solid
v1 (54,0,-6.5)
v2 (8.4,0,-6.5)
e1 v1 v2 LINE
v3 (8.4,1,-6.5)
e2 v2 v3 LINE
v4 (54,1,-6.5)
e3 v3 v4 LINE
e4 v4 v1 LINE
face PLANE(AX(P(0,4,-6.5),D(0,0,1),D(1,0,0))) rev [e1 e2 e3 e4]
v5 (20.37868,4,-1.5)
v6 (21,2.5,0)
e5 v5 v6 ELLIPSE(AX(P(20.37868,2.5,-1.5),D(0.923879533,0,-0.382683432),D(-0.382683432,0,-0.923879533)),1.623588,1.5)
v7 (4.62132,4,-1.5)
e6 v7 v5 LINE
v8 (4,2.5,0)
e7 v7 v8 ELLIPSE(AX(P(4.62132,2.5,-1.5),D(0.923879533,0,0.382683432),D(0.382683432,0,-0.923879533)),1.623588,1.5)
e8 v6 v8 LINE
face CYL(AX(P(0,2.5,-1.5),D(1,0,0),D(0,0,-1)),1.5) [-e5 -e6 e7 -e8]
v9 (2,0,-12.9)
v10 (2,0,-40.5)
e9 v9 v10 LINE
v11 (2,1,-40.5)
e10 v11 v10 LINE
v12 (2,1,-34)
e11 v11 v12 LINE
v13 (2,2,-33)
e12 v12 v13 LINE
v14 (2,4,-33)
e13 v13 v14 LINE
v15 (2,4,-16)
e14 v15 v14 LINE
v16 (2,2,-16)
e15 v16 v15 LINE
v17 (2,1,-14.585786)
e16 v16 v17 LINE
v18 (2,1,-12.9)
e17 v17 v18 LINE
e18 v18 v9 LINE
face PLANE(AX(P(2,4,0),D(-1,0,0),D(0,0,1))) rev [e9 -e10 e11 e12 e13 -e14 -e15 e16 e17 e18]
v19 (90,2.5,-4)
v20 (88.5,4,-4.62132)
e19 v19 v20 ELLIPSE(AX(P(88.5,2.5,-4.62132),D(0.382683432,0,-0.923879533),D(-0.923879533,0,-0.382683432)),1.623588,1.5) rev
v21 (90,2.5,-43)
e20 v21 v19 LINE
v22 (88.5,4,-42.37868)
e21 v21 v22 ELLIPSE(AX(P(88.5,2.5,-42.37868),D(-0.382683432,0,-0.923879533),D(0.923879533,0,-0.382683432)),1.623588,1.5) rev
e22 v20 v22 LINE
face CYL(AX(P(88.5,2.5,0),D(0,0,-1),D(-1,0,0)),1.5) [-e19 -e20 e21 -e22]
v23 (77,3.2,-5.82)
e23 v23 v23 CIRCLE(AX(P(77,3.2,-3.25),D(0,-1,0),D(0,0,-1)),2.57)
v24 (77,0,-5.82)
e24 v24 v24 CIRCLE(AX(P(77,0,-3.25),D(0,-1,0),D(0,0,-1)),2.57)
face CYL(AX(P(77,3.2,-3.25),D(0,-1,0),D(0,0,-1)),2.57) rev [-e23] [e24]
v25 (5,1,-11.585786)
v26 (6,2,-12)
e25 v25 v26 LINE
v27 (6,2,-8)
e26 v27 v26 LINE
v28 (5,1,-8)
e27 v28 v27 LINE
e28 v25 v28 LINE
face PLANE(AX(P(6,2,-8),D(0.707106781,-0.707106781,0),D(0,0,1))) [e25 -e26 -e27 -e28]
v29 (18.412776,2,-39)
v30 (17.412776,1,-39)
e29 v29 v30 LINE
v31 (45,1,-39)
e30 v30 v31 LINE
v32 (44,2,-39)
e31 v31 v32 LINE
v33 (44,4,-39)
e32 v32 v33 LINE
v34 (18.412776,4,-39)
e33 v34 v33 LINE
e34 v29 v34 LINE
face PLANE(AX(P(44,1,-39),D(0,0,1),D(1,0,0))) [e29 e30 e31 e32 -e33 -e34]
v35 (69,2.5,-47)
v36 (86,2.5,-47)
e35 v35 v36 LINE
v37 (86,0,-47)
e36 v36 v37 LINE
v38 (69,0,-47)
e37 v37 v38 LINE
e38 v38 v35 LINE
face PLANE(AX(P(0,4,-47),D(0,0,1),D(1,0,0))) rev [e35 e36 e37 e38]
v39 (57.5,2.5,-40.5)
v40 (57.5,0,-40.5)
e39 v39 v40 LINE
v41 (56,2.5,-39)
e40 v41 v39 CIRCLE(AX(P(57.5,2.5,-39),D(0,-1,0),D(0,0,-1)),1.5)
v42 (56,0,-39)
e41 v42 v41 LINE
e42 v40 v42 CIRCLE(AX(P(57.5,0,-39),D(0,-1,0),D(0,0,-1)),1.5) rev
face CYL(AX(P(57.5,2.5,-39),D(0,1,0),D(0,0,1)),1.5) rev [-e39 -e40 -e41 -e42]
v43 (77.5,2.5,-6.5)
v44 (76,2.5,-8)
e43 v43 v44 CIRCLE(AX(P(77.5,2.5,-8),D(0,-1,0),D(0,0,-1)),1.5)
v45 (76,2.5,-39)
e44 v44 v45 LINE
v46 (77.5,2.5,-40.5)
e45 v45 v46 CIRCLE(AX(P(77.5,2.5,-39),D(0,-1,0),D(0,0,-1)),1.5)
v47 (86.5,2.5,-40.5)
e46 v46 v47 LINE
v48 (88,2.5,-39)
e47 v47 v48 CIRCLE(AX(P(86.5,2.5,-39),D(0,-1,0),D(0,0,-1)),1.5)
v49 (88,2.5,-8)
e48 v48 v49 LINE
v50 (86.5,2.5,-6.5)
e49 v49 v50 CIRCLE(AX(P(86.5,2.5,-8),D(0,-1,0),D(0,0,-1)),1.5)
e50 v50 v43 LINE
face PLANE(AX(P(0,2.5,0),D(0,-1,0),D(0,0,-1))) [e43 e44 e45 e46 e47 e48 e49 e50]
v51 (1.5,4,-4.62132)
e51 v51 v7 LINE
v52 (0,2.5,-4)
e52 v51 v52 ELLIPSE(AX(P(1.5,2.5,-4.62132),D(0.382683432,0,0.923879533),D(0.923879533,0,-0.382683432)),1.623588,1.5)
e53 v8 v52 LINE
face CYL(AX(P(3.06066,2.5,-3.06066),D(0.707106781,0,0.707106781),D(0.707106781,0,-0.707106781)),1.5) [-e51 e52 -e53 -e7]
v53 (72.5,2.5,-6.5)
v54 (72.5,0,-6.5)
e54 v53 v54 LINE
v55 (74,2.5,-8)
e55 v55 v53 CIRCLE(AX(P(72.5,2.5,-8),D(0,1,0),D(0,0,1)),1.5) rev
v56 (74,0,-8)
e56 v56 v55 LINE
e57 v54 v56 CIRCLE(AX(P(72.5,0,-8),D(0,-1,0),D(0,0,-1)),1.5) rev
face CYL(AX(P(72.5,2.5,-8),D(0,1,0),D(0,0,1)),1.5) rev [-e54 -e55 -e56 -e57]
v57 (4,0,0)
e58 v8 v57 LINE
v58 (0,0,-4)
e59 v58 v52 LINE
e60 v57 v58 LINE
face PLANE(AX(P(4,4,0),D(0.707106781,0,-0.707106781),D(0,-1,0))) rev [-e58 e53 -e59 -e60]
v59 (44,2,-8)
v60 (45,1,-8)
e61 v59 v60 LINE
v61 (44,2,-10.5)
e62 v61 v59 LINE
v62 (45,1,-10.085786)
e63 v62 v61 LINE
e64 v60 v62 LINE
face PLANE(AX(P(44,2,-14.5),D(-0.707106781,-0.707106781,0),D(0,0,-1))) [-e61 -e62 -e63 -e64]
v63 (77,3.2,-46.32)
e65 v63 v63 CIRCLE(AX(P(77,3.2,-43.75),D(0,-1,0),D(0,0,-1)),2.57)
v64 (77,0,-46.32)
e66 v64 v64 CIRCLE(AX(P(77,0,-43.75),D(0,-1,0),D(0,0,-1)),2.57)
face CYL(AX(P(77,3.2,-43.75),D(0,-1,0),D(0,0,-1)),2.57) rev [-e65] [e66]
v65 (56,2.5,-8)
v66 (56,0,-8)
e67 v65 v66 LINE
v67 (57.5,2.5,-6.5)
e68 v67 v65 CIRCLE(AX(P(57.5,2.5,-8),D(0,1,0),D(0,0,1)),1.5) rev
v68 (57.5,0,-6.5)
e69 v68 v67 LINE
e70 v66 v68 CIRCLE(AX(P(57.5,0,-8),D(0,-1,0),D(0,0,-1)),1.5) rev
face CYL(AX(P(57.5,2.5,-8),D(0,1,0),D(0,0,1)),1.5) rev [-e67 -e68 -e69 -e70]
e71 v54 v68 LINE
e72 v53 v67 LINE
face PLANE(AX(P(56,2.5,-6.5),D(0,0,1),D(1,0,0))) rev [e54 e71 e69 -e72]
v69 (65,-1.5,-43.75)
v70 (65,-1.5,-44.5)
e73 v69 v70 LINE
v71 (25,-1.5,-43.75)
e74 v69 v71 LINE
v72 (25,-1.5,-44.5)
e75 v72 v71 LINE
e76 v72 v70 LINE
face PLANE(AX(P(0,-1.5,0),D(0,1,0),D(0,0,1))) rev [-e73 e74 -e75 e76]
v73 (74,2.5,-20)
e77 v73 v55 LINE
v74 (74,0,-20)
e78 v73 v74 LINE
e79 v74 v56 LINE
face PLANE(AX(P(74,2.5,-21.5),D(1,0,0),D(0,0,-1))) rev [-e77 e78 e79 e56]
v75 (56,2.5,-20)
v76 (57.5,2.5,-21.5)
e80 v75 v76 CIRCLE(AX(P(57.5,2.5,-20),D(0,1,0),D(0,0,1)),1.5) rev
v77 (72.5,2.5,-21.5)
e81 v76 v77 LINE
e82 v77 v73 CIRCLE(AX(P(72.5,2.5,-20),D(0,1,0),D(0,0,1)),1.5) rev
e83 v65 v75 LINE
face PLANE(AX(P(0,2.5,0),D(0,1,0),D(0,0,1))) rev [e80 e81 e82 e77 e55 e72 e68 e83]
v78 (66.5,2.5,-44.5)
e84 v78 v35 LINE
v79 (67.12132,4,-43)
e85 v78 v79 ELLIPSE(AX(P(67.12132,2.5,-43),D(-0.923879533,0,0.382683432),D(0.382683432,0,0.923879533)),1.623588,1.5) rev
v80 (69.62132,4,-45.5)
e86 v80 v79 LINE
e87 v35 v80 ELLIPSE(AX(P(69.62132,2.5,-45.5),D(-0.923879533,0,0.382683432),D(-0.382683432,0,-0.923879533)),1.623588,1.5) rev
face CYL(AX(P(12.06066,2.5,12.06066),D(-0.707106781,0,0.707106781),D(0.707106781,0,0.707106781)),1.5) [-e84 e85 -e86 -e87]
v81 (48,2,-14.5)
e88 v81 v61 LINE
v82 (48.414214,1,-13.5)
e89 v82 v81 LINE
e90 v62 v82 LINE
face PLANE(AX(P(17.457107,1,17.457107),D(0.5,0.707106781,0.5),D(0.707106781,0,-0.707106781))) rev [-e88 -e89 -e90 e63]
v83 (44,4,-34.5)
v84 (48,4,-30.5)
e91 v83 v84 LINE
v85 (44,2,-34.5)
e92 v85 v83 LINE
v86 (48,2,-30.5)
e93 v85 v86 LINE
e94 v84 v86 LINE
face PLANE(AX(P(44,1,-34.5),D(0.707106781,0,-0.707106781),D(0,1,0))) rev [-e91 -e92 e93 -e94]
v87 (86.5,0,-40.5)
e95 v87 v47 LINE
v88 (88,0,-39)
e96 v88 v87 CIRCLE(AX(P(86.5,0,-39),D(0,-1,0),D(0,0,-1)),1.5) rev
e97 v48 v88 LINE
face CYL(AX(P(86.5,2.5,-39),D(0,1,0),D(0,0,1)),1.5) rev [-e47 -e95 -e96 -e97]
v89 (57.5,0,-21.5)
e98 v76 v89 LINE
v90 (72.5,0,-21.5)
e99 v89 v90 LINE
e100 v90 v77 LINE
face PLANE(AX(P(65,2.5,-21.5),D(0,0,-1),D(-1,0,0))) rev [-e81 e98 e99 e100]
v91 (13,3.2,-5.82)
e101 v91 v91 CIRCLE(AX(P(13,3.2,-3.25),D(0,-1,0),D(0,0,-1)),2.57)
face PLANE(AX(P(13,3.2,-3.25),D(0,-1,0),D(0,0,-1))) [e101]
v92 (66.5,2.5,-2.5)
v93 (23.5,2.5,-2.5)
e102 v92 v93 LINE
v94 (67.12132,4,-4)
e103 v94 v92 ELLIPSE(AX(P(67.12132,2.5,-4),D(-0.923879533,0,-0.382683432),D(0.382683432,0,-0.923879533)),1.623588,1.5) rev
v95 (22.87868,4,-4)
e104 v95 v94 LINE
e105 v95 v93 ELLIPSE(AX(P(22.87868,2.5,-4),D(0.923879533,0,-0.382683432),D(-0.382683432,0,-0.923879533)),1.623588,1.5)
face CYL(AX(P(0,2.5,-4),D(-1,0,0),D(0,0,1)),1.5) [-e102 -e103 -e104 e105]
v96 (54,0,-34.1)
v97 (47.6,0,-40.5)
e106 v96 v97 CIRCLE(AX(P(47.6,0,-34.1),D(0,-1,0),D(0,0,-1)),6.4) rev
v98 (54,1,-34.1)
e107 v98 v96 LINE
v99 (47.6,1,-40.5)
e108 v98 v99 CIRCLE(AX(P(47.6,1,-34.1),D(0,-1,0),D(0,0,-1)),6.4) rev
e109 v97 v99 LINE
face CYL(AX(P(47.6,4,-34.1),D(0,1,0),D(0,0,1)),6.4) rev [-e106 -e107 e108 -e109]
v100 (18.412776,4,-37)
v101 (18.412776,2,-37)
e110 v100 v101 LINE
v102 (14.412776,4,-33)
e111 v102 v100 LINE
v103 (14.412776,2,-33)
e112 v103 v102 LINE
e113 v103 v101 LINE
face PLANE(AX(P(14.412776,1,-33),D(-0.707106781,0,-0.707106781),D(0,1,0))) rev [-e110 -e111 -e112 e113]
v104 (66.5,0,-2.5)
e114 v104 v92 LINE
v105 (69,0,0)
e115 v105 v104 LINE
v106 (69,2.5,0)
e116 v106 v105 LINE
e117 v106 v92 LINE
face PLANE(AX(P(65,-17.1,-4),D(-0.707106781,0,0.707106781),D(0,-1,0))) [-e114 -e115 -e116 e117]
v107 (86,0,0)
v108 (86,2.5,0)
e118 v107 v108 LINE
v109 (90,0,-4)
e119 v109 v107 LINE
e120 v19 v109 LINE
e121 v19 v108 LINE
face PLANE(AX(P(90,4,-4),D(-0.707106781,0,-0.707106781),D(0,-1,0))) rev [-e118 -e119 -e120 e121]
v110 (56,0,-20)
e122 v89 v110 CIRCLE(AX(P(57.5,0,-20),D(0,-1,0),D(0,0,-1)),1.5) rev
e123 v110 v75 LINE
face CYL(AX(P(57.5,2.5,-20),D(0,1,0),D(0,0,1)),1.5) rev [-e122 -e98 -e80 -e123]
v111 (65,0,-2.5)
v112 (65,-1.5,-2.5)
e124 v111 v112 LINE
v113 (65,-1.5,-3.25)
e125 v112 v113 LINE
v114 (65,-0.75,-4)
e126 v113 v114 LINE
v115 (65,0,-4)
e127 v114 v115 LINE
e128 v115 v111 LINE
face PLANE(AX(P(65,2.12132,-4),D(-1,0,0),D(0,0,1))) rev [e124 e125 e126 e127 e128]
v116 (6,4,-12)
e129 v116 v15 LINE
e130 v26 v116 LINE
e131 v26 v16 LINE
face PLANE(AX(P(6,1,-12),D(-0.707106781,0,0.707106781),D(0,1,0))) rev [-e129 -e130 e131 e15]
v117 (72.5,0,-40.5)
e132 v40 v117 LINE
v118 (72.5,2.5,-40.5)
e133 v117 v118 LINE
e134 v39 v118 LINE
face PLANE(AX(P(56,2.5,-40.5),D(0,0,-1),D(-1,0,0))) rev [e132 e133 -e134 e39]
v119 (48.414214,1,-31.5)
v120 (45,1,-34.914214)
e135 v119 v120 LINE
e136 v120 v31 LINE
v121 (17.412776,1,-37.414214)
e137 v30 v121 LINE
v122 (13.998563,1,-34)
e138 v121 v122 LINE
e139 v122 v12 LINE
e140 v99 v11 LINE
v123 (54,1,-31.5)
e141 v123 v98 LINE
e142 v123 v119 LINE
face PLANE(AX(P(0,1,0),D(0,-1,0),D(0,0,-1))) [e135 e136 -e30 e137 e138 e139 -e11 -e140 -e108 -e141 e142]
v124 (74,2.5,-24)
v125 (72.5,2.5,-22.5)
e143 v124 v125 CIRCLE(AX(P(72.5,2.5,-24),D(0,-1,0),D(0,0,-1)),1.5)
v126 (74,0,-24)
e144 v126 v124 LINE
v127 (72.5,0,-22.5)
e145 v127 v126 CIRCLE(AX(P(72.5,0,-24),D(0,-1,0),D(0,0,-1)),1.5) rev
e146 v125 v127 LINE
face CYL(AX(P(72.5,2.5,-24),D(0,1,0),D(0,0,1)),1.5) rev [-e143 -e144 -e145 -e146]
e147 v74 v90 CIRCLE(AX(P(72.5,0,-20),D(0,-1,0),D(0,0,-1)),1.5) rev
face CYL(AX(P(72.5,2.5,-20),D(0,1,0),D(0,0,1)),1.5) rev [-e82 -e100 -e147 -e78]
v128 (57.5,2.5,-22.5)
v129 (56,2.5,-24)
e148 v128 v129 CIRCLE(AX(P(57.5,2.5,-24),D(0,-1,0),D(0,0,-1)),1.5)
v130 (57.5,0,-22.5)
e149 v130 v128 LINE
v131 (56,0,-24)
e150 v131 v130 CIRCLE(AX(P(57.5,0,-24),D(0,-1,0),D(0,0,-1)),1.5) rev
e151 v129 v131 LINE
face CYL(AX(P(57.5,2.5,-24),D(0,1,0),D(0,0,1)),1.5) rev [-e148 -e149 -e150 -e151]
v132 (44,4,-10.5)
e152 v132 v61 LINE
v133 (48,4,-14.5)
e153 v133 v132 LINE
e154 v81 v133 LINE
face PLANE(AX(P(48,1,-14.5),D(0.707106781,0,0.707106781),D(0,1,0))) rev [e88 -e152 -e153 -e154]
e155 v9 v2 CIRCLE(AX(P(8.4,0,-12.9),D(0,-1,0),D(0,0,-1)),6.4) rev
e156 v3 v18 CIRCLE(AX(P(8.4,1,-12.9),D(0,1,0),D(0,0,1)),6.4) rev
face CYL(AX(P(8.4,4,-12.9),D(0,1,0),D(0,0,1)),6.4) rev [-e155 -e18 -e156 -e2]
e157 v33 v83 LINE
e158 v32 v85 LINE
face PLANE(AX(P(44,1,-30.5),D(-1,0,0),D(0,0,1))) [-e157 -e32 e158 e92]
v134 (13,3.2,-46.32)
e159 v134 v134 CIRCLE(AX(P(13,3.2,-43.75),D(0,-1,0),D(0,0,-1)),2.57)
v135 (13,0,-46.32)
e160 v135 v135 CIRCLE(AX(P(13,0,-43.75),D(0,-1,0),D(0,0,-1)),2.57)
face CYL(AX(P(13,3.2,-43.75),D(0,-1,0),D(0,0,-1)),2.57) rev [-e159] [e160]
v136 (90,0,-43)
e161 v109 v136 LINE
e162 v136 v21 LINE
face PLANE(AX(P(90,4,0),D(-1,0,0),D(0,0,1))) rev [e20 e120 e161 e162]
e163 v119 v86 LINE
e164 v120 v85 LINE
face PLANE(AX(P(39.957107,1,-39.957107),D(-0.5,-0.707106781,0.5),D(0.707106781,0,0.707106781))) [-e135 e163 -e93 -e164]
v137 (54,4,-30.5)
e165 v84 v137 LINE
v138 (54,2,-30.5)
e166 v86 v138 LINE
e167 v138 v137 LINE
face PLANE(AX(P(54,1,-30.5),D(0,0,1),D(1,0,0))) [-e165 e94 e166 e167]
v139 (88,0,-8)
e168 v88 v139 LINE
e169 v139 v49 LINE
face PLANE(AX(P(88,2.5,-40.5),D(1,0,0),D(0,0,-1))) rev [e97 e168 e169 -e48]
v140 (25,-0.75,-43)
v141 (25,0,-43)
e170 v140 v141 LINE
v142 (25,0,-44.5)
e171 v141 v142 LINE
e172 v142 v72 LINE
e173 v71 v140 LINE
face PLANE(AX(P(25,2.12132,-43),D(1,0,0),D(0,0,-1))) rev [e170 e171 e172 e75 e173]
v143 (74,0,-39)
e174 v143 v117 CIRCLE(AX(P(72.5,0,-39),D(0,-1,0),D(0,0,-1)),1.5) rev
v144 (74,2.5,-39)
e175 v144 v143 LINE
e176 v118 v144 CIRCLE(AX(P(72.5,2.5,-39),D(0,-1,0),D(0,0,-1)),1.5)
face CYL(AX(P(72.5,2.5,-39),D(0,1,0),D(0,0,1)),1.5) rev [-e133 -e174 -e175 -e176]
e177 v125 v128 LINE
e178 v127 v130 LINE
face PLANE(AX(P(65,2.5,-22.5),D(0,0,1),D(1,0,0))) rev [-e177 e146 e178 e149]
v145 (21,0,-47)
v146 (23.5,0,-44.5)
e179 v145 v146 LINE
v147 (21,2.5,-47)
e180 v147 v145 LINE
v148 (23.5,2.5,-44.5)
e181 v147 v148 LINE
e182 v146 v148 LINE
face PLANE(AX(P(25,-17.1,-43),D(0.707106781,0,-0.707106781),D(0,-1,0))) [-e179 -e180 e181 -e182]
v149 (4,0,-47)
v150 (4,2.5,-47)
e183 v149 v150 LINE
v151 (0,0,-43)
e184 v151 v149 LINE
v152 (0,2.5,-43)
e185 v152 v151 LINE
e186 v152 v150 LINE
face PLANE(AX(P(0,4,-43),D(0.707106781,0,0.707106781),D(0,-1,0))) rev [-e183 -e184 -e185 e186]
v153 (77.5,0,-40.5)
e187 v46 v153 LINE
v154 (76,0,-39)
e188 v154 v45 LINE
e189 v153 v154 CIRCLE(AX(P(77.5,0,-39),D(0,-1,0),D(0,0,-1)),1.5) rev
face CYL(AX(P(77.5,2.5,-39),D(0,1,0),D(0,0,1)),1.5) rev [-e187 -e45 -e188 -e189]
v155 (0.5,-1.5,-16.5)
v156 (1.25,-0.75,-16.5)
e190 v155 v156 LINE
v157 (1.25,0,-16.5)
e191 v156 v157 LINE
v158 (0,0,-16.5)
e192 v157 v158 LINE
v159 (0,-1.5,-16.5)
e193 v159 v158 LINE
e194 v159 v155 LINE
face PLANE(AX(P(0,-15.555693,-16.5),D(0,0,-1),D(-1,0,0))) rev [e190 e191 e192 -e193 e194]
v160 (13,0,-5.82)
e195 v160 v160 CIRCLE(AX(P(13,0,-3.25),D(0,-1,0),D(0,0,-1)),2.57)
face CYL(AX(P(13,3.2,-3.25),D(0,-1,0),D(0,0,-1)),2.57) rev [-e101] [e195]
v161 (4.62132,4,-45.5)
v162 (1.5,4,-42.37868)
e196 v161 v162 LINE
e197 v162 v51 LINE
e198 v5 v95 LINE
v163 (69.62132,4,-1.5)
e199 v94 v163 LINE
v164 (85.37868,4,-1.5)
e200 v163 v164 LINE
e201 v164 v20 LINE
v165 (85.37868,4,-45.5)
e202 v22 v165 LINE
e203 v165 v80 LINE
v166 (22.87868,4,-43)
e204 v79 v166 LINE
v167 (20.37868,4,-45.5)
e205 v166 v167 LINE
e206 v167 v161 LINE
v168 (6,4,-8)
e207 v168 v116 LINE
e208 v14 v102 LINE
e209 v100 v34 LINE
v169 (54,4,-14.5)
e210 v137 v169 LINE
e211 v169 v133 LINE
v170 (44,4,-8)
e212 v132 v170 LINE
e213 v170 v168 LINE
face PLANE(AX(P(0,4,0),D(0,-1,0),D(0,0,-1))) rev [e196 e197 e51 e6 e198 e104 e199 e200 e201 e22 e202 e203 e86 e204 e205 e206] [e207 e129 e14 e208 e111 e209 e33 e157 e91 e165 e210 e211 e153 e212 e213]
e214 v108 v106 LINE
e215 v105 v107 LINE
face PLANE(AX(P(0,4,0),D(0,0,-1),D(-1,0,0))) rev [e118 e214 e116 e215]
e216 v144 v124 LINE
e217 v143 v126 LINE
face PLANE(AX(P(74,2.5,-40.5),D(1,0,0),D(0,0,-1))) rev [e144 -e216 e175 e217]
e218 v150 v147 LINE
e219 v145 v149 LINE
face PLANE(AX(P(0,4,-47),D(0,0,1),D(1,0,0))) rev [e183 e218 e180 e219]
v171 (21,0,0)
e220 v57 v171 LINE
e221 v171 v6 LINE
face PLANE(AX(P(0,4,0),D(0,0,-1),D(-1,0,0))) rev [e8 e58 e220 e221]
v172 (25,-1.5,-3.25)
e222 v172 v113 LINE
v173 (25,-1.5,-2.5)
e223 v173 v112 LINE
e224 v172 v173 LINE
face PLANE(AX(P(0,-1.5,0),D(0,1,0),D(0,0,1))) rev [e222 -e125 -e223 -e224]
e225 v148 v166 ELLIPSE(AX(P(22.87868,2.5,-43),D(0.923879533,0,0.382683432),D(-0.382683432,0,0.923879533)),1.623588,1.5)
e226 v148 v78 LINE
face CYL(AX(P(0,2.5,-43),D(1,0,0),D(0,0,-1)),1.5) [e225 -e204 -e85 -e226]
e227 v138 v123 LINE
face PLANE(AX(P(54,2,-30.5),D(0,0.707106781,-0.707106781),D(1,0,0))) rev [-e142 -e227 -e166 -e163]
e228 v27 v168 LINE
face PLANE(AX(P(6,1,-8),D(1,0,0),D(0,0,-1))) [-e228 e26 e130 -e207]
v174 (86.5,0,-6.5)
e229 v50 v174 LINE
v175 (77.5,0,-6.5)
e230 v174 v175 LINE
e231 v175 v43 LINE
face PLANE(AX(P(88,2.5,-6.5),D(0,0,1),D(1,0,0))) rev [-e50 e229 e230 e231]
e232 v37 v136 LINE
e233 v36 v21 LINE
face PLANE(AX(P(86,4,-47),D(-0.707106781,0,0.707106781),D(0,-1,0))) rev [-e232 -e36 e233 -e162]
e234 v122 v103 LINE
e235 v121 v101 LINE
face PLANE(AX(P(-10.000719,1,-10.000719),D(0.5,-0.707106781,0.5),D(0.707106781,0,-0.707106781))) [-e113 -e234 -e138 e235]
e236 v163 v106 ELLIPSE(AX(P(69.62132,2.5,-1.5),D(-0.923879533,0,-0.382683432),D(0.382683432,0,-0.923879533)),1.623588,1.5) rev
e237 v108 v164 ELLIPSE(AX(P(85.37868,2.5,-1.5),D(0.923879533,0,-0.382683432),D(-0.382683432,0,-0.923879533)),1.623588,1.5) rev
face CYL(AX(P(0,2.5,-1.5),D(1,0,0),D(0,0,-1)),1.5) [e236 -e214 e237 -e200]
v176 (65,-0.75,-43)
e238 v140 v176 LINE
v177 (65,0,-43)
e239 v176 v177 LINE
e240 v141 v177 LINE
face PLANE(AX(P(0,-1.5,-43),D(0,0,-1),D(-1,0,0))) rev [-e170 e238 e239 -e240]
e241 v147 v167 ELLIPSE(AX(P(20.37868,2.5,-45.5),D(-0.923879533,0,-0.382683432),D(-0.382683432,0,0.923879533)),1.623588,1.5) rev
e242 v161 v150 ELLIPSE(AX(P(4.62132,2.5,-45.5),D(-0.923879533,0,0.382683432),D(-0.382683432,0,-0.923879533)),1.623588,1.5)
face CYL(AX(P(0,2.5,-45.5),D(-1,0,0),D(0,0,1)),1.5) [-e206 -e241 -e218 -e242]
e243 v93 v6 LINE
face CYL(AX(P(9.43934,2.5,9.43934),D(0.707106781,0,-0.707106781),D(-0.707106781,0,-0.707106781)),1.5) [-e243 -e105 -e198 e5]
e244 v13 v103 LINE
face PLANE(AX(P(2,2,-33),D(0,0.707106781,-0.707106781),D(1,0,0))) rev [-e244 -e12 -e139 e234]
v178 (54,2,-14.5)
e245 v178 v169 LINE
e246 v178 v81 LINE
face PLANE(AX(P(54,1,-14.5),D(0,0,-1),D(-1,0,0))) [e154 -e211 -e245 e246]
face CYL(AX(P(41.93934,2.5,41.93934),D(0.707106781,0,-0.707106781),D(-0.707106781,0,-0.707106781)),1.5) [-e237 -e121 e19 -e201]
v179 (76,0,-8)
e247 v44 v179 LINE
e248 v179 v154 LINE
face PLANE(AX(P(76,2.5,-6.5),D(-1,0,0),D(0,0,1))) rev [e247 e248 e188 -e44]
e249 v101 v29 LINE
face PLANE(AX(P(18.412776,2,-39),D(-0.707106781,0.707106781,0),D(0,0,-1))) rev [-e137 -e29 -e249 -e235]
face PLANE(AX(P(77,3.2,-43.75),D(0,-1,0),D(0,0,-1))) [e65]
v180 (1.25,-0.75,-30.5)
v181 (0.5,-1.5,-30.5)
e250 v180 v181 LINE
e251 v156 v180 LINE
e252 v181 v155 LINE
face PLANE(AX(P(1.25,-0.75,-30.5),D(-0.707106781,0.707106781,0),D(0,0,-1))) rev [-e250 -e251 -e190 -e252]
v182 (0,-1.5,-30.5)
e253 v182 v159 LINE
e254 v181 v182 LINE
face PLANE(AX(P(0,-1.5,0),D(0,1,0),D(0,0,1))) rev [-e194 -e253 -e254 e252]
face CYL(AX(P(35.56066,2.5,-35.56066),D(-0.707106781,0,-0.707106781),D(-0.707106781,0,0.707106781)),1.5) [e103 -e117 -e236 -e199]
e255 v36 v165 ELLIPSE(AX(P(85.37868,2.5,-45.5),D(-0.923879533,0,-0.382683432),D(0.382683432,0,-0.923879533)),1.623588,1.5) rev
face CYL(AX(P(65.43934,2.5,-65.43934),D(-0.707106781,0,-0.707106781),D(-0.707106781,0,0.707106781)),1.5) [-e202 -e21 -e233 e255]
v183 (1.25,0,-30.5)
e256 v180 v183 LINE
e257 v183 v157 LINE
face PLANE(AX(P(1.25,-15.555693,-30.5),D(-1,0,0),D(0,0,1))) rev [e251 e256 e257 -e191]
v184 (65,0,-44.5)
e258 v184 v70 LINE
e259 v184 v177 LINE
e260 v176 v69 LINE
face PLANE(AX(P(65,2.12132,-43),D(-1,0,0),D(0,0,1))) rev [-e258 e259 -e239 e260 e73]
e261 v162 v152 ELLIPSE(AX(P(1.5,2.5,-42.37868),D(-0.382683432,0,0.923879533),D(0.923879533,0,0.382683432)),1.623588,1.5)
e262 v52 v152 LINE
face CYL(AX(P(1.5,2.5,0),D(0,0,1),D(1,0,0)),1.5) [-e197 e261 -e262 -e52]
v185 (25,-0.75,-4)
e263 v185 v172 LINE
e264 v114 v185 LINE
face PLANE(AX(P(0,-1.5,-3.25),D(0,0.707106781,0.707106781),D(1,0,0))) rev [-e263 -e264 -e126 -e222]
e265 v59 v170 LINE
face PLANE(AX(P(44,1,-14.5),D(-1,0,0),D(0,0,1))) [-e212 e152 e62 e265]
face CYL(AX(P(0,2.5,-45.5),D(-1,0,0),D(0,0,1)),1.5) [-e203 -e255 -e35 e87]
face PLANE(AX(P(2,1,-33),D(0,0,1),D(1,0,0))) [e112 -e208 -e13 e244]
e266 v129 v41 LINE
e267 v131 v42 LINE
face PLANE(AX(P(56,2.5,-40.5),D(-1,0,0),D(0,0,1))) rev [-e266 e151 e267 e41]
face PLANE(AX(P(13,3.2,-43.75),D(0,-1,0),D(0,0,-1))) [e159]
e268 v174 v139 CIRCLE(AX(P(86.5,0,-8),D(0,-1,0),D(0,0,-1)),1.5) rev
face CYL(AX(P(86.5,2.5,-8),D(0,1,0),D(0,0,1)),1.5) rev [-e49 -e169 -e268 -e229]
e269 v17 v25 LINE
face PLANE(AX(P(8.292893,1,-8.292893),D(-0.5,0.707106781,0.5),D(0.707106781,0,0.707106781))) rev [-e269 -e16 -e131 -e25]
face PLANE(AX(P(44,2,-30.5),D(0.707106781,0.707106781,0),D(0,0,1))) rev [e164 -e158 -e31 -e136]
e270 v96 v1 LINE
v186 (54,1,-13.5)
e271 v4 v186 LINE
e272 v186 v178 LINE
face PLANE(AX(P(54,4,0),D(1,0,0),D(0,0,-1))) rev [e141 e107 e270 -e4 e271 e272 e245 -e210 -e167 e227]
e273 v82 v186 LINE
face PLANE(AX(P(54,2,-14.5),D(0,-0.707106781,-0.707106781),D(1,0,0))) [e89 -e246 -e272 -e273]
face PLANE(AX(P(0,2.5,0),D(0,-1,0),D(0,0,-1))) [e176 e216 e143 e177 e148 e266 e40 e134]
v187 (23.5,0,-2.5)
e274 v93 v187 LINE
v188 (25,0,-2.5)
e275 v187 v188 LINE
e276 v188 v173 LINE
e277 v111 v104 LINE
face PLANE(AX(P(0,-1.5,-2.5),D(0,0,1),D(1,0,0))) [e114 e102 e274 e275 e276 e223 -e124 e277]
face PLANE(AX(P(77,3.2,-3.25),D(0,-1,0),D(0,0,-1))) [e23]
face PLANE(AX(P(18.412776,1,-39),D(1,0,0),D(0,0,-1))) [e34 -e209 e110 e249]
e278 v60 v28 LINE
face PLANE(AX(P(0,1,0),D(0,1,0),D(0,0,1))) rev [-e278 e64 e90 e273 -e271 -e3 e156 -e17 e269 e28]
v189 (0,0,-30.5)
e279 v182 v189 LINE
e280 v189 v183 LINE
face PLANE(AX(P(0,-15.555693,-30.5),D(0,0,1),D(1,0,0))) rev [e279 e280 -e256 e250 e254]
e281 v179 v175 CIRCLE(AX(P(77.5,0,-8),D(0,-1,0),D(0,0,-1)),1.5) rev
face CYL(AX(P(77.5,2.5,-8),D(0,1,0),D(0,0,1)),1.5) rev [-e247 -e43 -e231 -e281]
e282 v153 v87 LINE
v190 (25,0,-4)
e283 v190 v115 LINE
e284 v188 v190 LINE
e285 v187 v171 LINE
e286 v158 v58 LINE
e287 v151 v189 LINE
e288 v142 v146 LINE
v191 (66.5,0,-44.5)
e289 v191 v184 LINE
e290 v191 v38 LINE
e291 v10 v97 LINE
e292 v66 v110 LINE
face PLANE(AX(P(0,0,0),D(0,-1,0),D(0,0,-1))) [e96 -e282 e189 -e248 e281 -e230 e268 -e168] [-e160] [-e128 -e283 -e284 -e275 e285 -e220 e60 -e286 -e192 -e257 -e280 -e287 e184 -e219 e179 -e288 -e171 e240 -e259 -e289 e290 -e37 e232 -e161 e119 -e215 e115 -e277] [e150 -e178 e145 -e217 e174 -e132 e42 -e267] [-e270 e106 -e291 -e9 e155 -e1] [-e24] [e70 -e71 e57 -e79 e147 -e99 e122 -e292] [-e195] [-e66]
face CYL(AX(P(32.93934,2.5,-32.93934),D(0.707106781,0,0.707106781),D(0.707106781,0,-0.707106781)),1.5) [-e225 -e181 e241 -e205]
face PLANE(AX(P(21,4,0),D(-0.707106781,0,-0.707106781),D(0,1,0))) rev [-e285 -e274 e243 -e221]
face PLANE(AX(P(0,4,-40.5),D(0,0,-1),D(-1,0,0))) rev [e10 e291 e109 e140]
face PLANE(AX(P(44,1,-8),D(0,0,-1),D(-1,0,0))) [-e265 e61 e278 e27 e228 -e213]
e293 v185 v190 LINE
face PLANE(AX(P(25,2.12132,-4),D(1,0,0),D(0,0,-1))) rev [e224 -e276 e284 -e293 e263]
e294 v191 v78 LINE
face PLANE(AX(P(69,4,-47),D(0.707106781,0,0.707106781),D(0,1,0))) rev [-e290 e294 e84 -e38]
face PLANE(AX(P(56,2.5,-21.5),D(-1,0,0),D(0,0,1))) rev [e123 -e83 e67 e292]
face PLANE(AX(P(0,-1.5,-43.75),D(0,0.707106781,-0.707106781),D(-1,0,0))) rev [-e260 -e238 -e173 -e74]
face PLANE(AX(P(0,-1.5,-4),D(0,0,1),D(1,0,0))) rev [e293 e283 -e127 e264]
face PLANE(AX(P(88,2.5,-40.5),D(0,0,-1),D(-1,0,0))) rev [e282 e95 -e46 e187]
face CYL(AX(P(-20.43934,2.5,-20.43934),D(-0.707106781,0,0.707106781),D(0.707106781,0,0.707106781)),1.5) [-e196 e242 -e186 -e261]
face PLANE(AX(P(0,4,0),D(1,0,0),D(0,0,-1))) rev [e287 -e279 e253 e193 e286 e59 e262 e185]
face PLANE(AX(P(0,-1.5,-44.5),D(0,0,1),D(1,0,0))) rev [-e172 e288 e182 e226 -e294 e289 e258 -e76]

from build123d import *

# Parameters (mm, degrees)
SKETCH1_W           = 90
SKETCH1_H           = 47
BOSS_EXTRUDE1_DEPTH = 4
CUT_EXTRUDE1_START  = -4
CUT_EXTRUDE1_DEPTH  = 106.612007165
FILLET1_R           = 6.4
CUT_EXTRUDE3_START  = -4
SKETCH4_R           = 2.57
CUT_EXTRUDE3_DEPTH  = 3.2
SKETCH5_W           = 20
SKETCH5_H           = 4
CUT_EXTRUDE4_DEPTH  = 21.1
CHAMFER1_SIZE       = 4
BOSS_EXTRUDE2_DEPTH = 3
CHAMFER2_SIZE       = 4
CHAMFER3_SIZE       = 4
SKETCH7_W           = 12
SKETCH7_H           = 34
CUT_EXTRUDE5_DEPTH  = 2.5
FILLET2_R           = 1.5
CHAMFER4_SIZE       = 1
BOSS_EXTRUDE3_DEPTH = 5.5
CUT_EXTRUDE6_DEPTH  = 1.5
FILLET3_R           = 1.5
BOSS_EXTRUDE4_DEPTH = 1.5
CHAMFER6_SIZE       = 0.75


with BuildPart() as part:
    # Sketch1 → Boss-Extrude1 (new body)
    with BuildSketch(Plane(origin=(0, 0, 0), x_dir=(1, 0, 0), z_dir=(0, 1, 0))):
        with Locations((45, 23.5)):
            Rectangle(SKETCH1_W, SKETCH1_H)
    extrude(amount=BOSS_EXTRUDE1_DEPTH)

    # Sketch2 → Cut-Extrude1 (cut, through all)
    with BuildSketch(Plane(origin=(0, 4, 0), x_dir=(1, 0, 0), z_dir=(0, 1, 0)).offset(CUT_EXTRUDE1_START)):
        Polygon((2, 23.5), (2, 40.5), (54, 40.5), (54, 6.5), (2, 6.5), align=None)
    extrude(amount=CUT_EXTRUDE1_DEPTH, mode=Mode.SUBTRACT)

    # Fillet1
    fillet1_edges = [part.edges().sort_by_distance(p)[0] for p in [
        (54, 2, -40.5),
        (2, 2, -6.5),
    ]]
    fillet(fillet1_edges, radius=FILLET1_R)

    # Sketch4 → Cut-Extrude3 (cut)
    with BuildSketch(Plane(origin=(0, 4, 0), x_dir=(1, 0, 0), z_dir=(0, 1, 0)).offset(CUT_EXTRUDE3_START)):
        with Locations(Location((13, 43.75, 0), (0, 0, 90))):
            Circle(SKETCH4_R)
        with Locations(Location((13, 3.25, 0), (0, 0, 90))):
            Circle(SKETCH4_R)
        with Locations(Location((77, 3.25, 0), (0, 0, 90))):
            Circle(SKETCH4_R)
        with Locations(Location((77, 43.75, 0), (0, 0, 90))):
            Circle(SKETCH4_R)
    extrude(amount=CUT_EXTRUDE3_DEPTH, mode=Mode.SUBTRACT)

    # Sketch5 → Cut-Extrude4 (cut)
    with BuildSketch(Plane(origin=(0, 4, 0), x_dir=(1, 0, 0), z_dir=(0, 1, 0))):
        with Locations((35, 2)):
            Rectangle(SKETCH5_W, SKETCH5_H)
        with Locations((55, 2)):
            Rectangle(SKETCH5_W, SKETCH5_H)
        with Locations((35, 45)):
            Rectangle(SKETCH5_W, SKETCH5_H)
        with Locations((55, 45)):
            Rectangle(SKETCH5_W, SKETCH5_H)
    extrude(amount=-CUT_EXTRUDE4_DEPTH, mode=Mode.SUBTRACT)

    # Chamfer1
    chamfer1_edges = [part.edges().sort_by_distance(p)[0] for p in [
        (90, 2, 0),
        (90, 2, -47),
        (0, 2, -47),
        (0, 2, 0),
        (25, 2, -47),
        (65, 2, -47),
        (65, 2, 0),
        (25, 2, 0),
    ]]
    chamfer(chamfer1_edges, length=CHAMFER1_SIZE - 0.0001)  # a hair under: the kernel refuses the full size

    # Sketch6 → Boss-Extrude2 (add)
    with BuildSketch(Plane(origin=(0, 4, 0), x_dir=(1, 0, 0), z_dir=(0, 1, 0))):
        Polygon((54, 6.5), (54, 14.5), (44, 14.5), (44, 8), (6, 8), (6, 16), (2, 16), (2, 6.5), (42, 6.5), align=None)
        Polygon((47.6, 40.5), (54, 40.5), (54, 30.5), (44, 30.5), (44, 39), (18.412776199, 39), (18.412776199, 33), (2, 33), (2, 40.5), align=None)
    extrude(amount=-BOSS_EXTRUDE2_DEPTH)

    # Chamfer2
    chamfer2_edges = [part.edges().sort_by_distance(p)[0] for p in [
        (44, 2.5, -14.5),
        (44, 2.5, -30.5),
        (18.412776199, 2.5, -33),
    ]]
    chamfer(chamfer2_edges, length=CHAMFER2_SIZE)

    # Chamfer3
    chamfer3_edges = [part.edges().sort_by_distance(p)[0] for p in [
        (6, 2.5, -16),
    ]]
    chamfer(chamfer3_edges, length=CHAMFER3_SIZE - 0.0001)  # a hair under: the kernel refuses the full size

    # Sketch7 → Cut-Extrude5 (cut)
    with BuildSketch(Plane.XZ):
        Polygon((65, -22.5), (56, -22.5), (56, -40.5), (74, -40.5), (74, -22.5), align=None)
        Polygon((56, -6.5), (74, -6.5), (74, -21.5), (65, -21.5), (56, -21.5), align=None)
        with Locations((82, -23.5)):
            Rectangle(SKETCH7_W, SKETCH7_H)
    extrude(amount=-CUT_EXTRUDE5_DEPTH, mode=Mode.SUBTRACT)

    # Fillet2
    fillet2_edges = [part.edges().sort_by_distance(p)[0] for p in [
        (76, 1.25, -6.5),
        (88, 1.25, -6.5),
        (88, 1.25, -40.5),
        (76, 1.25, -40.5),
        (56, 1.25, -21.5),
        (56, 1.25, -6.5),
        (74, 1.25, -6.5),
        (74, 1.25, -21.5),
        (74, 1.25, -22.5),
        (74, 1.25, -40.5),
        (56, 1.25, -40.5),
        (56, 1.25, -22.5),
    ]]
    fillet(fillet2_edges, radius=FILLET2_R)

    # Chamfer4
    chamfer4_edges = [part.edges().sort_by_distance(p)[0] for p in [
        (6, 1, -10.00005),
        (51, 1, -14.5),
        (44, 1, -36.75),
        (8.206388099, 1, -33),
        (18.412776199, 1, -38),
        (51, 1, -30.5),
        (46, 1, -32.5),
        (16.412776199, 1, -35),
        (44, 1, -9.25),
        (46, 1, -12.5),
        (4.00005, 1, -14.00005),
    ]]
    chamfer(chamfer4_edges, length=CHAMFER4_SIZE)

    # Sketch8 → Boss-Extrude3 (add)
    with BuildSketch(Plane(origin=(0, 4, 0), x_dir=(1, 0, 0), z_dir=(0, 1, 0))):
        Polygon((65, 4), (45, 4), (45, 2.5), (66.5, 2.5), align=None)
        Polygon((45, 2.5), (45, 4), (25, 4), (23.5, 2.5), align=None)
        Polygon((66.5, 44.5), (45, 44.5), (45, 43), (65, 43), align=None)
        Polygon((45, 44.5), (23.5, 44.5), (25, 43), (45, 43), align=None)
    extrude(amount=-BOSS_EXTRUDE3_DEPTH)

    # Sketch10 → Cut-Extrude6 (cut)
    with BuildSketch(Plane(origin=(0, -1.5, 0), x_dir=(-1, 0, 0), z_dir=(0, -1, 0))):
        Polygon((-25, 4), (-25, 2.5), (-23.5, 2.5), align=None)
        Polygon((-65, 4), (-65, 2.5), (-66.5, 2.5), align=None)
        Polygon((-65, 43), (-65, 44.5), (-66.5, 44.5), align=None)
        Polygon((-25, 43), (-25, 44.5), (-23.5, 44.5), align=None)
    extrude(amount=-CUT_EXTRUDE6_DEPTH, mode=Mode.SUBTRACT)

    # Fillet3
    fillet3_edges = [part.edges().sort_by_distance(p)[0] for p in [
        (77.5, 4, 0),
        (90, 4, -23.5),
        (77.5, 4, -47),
        (12.5, 4, -47),
        (0, 4, -23.5),
        (12.5, 4, 0),
        (1.99995, 4, -1.99995),
        (1.99995, 4, -45.00005),
        (88.00005, 4, -45.00005),
        (88.00005, 4, -1.99995),
        (22.2501, 4, -1.25),
        (67.7499, 4, -45.75),
        (67.7499, 4, -1.25),
        (45, 4, -2.5),
        (22.2501, 4, -45.75),
        (45, 4, -44.5),
    ]]
    fillet(fillet3_edges, radius=FILLET3_R)

    # Sketch11 → Boss-Extrude4 (add)
    with BuildSketch(Plane.XZ):
        Polygon((0, -23.5), (0, -16.5), (1.25, -16.5), (1.25, -30.5), (0, -30.5), align=None)
    extrude(amount=BOSS_EXTRUDE4_DEPTH)

    # Chamfer6
    chamfer6_edges = [part.edges().sort_by_distance(p)[0] for p in [
        (45, -1.5, -4),
        (45, -1.5, -43),
        (1.25, -1.5, -23.5),
    ]]
    chamfer(chamfer6_edges, length=CHAMFER6_SIZE)


solid = part.part
